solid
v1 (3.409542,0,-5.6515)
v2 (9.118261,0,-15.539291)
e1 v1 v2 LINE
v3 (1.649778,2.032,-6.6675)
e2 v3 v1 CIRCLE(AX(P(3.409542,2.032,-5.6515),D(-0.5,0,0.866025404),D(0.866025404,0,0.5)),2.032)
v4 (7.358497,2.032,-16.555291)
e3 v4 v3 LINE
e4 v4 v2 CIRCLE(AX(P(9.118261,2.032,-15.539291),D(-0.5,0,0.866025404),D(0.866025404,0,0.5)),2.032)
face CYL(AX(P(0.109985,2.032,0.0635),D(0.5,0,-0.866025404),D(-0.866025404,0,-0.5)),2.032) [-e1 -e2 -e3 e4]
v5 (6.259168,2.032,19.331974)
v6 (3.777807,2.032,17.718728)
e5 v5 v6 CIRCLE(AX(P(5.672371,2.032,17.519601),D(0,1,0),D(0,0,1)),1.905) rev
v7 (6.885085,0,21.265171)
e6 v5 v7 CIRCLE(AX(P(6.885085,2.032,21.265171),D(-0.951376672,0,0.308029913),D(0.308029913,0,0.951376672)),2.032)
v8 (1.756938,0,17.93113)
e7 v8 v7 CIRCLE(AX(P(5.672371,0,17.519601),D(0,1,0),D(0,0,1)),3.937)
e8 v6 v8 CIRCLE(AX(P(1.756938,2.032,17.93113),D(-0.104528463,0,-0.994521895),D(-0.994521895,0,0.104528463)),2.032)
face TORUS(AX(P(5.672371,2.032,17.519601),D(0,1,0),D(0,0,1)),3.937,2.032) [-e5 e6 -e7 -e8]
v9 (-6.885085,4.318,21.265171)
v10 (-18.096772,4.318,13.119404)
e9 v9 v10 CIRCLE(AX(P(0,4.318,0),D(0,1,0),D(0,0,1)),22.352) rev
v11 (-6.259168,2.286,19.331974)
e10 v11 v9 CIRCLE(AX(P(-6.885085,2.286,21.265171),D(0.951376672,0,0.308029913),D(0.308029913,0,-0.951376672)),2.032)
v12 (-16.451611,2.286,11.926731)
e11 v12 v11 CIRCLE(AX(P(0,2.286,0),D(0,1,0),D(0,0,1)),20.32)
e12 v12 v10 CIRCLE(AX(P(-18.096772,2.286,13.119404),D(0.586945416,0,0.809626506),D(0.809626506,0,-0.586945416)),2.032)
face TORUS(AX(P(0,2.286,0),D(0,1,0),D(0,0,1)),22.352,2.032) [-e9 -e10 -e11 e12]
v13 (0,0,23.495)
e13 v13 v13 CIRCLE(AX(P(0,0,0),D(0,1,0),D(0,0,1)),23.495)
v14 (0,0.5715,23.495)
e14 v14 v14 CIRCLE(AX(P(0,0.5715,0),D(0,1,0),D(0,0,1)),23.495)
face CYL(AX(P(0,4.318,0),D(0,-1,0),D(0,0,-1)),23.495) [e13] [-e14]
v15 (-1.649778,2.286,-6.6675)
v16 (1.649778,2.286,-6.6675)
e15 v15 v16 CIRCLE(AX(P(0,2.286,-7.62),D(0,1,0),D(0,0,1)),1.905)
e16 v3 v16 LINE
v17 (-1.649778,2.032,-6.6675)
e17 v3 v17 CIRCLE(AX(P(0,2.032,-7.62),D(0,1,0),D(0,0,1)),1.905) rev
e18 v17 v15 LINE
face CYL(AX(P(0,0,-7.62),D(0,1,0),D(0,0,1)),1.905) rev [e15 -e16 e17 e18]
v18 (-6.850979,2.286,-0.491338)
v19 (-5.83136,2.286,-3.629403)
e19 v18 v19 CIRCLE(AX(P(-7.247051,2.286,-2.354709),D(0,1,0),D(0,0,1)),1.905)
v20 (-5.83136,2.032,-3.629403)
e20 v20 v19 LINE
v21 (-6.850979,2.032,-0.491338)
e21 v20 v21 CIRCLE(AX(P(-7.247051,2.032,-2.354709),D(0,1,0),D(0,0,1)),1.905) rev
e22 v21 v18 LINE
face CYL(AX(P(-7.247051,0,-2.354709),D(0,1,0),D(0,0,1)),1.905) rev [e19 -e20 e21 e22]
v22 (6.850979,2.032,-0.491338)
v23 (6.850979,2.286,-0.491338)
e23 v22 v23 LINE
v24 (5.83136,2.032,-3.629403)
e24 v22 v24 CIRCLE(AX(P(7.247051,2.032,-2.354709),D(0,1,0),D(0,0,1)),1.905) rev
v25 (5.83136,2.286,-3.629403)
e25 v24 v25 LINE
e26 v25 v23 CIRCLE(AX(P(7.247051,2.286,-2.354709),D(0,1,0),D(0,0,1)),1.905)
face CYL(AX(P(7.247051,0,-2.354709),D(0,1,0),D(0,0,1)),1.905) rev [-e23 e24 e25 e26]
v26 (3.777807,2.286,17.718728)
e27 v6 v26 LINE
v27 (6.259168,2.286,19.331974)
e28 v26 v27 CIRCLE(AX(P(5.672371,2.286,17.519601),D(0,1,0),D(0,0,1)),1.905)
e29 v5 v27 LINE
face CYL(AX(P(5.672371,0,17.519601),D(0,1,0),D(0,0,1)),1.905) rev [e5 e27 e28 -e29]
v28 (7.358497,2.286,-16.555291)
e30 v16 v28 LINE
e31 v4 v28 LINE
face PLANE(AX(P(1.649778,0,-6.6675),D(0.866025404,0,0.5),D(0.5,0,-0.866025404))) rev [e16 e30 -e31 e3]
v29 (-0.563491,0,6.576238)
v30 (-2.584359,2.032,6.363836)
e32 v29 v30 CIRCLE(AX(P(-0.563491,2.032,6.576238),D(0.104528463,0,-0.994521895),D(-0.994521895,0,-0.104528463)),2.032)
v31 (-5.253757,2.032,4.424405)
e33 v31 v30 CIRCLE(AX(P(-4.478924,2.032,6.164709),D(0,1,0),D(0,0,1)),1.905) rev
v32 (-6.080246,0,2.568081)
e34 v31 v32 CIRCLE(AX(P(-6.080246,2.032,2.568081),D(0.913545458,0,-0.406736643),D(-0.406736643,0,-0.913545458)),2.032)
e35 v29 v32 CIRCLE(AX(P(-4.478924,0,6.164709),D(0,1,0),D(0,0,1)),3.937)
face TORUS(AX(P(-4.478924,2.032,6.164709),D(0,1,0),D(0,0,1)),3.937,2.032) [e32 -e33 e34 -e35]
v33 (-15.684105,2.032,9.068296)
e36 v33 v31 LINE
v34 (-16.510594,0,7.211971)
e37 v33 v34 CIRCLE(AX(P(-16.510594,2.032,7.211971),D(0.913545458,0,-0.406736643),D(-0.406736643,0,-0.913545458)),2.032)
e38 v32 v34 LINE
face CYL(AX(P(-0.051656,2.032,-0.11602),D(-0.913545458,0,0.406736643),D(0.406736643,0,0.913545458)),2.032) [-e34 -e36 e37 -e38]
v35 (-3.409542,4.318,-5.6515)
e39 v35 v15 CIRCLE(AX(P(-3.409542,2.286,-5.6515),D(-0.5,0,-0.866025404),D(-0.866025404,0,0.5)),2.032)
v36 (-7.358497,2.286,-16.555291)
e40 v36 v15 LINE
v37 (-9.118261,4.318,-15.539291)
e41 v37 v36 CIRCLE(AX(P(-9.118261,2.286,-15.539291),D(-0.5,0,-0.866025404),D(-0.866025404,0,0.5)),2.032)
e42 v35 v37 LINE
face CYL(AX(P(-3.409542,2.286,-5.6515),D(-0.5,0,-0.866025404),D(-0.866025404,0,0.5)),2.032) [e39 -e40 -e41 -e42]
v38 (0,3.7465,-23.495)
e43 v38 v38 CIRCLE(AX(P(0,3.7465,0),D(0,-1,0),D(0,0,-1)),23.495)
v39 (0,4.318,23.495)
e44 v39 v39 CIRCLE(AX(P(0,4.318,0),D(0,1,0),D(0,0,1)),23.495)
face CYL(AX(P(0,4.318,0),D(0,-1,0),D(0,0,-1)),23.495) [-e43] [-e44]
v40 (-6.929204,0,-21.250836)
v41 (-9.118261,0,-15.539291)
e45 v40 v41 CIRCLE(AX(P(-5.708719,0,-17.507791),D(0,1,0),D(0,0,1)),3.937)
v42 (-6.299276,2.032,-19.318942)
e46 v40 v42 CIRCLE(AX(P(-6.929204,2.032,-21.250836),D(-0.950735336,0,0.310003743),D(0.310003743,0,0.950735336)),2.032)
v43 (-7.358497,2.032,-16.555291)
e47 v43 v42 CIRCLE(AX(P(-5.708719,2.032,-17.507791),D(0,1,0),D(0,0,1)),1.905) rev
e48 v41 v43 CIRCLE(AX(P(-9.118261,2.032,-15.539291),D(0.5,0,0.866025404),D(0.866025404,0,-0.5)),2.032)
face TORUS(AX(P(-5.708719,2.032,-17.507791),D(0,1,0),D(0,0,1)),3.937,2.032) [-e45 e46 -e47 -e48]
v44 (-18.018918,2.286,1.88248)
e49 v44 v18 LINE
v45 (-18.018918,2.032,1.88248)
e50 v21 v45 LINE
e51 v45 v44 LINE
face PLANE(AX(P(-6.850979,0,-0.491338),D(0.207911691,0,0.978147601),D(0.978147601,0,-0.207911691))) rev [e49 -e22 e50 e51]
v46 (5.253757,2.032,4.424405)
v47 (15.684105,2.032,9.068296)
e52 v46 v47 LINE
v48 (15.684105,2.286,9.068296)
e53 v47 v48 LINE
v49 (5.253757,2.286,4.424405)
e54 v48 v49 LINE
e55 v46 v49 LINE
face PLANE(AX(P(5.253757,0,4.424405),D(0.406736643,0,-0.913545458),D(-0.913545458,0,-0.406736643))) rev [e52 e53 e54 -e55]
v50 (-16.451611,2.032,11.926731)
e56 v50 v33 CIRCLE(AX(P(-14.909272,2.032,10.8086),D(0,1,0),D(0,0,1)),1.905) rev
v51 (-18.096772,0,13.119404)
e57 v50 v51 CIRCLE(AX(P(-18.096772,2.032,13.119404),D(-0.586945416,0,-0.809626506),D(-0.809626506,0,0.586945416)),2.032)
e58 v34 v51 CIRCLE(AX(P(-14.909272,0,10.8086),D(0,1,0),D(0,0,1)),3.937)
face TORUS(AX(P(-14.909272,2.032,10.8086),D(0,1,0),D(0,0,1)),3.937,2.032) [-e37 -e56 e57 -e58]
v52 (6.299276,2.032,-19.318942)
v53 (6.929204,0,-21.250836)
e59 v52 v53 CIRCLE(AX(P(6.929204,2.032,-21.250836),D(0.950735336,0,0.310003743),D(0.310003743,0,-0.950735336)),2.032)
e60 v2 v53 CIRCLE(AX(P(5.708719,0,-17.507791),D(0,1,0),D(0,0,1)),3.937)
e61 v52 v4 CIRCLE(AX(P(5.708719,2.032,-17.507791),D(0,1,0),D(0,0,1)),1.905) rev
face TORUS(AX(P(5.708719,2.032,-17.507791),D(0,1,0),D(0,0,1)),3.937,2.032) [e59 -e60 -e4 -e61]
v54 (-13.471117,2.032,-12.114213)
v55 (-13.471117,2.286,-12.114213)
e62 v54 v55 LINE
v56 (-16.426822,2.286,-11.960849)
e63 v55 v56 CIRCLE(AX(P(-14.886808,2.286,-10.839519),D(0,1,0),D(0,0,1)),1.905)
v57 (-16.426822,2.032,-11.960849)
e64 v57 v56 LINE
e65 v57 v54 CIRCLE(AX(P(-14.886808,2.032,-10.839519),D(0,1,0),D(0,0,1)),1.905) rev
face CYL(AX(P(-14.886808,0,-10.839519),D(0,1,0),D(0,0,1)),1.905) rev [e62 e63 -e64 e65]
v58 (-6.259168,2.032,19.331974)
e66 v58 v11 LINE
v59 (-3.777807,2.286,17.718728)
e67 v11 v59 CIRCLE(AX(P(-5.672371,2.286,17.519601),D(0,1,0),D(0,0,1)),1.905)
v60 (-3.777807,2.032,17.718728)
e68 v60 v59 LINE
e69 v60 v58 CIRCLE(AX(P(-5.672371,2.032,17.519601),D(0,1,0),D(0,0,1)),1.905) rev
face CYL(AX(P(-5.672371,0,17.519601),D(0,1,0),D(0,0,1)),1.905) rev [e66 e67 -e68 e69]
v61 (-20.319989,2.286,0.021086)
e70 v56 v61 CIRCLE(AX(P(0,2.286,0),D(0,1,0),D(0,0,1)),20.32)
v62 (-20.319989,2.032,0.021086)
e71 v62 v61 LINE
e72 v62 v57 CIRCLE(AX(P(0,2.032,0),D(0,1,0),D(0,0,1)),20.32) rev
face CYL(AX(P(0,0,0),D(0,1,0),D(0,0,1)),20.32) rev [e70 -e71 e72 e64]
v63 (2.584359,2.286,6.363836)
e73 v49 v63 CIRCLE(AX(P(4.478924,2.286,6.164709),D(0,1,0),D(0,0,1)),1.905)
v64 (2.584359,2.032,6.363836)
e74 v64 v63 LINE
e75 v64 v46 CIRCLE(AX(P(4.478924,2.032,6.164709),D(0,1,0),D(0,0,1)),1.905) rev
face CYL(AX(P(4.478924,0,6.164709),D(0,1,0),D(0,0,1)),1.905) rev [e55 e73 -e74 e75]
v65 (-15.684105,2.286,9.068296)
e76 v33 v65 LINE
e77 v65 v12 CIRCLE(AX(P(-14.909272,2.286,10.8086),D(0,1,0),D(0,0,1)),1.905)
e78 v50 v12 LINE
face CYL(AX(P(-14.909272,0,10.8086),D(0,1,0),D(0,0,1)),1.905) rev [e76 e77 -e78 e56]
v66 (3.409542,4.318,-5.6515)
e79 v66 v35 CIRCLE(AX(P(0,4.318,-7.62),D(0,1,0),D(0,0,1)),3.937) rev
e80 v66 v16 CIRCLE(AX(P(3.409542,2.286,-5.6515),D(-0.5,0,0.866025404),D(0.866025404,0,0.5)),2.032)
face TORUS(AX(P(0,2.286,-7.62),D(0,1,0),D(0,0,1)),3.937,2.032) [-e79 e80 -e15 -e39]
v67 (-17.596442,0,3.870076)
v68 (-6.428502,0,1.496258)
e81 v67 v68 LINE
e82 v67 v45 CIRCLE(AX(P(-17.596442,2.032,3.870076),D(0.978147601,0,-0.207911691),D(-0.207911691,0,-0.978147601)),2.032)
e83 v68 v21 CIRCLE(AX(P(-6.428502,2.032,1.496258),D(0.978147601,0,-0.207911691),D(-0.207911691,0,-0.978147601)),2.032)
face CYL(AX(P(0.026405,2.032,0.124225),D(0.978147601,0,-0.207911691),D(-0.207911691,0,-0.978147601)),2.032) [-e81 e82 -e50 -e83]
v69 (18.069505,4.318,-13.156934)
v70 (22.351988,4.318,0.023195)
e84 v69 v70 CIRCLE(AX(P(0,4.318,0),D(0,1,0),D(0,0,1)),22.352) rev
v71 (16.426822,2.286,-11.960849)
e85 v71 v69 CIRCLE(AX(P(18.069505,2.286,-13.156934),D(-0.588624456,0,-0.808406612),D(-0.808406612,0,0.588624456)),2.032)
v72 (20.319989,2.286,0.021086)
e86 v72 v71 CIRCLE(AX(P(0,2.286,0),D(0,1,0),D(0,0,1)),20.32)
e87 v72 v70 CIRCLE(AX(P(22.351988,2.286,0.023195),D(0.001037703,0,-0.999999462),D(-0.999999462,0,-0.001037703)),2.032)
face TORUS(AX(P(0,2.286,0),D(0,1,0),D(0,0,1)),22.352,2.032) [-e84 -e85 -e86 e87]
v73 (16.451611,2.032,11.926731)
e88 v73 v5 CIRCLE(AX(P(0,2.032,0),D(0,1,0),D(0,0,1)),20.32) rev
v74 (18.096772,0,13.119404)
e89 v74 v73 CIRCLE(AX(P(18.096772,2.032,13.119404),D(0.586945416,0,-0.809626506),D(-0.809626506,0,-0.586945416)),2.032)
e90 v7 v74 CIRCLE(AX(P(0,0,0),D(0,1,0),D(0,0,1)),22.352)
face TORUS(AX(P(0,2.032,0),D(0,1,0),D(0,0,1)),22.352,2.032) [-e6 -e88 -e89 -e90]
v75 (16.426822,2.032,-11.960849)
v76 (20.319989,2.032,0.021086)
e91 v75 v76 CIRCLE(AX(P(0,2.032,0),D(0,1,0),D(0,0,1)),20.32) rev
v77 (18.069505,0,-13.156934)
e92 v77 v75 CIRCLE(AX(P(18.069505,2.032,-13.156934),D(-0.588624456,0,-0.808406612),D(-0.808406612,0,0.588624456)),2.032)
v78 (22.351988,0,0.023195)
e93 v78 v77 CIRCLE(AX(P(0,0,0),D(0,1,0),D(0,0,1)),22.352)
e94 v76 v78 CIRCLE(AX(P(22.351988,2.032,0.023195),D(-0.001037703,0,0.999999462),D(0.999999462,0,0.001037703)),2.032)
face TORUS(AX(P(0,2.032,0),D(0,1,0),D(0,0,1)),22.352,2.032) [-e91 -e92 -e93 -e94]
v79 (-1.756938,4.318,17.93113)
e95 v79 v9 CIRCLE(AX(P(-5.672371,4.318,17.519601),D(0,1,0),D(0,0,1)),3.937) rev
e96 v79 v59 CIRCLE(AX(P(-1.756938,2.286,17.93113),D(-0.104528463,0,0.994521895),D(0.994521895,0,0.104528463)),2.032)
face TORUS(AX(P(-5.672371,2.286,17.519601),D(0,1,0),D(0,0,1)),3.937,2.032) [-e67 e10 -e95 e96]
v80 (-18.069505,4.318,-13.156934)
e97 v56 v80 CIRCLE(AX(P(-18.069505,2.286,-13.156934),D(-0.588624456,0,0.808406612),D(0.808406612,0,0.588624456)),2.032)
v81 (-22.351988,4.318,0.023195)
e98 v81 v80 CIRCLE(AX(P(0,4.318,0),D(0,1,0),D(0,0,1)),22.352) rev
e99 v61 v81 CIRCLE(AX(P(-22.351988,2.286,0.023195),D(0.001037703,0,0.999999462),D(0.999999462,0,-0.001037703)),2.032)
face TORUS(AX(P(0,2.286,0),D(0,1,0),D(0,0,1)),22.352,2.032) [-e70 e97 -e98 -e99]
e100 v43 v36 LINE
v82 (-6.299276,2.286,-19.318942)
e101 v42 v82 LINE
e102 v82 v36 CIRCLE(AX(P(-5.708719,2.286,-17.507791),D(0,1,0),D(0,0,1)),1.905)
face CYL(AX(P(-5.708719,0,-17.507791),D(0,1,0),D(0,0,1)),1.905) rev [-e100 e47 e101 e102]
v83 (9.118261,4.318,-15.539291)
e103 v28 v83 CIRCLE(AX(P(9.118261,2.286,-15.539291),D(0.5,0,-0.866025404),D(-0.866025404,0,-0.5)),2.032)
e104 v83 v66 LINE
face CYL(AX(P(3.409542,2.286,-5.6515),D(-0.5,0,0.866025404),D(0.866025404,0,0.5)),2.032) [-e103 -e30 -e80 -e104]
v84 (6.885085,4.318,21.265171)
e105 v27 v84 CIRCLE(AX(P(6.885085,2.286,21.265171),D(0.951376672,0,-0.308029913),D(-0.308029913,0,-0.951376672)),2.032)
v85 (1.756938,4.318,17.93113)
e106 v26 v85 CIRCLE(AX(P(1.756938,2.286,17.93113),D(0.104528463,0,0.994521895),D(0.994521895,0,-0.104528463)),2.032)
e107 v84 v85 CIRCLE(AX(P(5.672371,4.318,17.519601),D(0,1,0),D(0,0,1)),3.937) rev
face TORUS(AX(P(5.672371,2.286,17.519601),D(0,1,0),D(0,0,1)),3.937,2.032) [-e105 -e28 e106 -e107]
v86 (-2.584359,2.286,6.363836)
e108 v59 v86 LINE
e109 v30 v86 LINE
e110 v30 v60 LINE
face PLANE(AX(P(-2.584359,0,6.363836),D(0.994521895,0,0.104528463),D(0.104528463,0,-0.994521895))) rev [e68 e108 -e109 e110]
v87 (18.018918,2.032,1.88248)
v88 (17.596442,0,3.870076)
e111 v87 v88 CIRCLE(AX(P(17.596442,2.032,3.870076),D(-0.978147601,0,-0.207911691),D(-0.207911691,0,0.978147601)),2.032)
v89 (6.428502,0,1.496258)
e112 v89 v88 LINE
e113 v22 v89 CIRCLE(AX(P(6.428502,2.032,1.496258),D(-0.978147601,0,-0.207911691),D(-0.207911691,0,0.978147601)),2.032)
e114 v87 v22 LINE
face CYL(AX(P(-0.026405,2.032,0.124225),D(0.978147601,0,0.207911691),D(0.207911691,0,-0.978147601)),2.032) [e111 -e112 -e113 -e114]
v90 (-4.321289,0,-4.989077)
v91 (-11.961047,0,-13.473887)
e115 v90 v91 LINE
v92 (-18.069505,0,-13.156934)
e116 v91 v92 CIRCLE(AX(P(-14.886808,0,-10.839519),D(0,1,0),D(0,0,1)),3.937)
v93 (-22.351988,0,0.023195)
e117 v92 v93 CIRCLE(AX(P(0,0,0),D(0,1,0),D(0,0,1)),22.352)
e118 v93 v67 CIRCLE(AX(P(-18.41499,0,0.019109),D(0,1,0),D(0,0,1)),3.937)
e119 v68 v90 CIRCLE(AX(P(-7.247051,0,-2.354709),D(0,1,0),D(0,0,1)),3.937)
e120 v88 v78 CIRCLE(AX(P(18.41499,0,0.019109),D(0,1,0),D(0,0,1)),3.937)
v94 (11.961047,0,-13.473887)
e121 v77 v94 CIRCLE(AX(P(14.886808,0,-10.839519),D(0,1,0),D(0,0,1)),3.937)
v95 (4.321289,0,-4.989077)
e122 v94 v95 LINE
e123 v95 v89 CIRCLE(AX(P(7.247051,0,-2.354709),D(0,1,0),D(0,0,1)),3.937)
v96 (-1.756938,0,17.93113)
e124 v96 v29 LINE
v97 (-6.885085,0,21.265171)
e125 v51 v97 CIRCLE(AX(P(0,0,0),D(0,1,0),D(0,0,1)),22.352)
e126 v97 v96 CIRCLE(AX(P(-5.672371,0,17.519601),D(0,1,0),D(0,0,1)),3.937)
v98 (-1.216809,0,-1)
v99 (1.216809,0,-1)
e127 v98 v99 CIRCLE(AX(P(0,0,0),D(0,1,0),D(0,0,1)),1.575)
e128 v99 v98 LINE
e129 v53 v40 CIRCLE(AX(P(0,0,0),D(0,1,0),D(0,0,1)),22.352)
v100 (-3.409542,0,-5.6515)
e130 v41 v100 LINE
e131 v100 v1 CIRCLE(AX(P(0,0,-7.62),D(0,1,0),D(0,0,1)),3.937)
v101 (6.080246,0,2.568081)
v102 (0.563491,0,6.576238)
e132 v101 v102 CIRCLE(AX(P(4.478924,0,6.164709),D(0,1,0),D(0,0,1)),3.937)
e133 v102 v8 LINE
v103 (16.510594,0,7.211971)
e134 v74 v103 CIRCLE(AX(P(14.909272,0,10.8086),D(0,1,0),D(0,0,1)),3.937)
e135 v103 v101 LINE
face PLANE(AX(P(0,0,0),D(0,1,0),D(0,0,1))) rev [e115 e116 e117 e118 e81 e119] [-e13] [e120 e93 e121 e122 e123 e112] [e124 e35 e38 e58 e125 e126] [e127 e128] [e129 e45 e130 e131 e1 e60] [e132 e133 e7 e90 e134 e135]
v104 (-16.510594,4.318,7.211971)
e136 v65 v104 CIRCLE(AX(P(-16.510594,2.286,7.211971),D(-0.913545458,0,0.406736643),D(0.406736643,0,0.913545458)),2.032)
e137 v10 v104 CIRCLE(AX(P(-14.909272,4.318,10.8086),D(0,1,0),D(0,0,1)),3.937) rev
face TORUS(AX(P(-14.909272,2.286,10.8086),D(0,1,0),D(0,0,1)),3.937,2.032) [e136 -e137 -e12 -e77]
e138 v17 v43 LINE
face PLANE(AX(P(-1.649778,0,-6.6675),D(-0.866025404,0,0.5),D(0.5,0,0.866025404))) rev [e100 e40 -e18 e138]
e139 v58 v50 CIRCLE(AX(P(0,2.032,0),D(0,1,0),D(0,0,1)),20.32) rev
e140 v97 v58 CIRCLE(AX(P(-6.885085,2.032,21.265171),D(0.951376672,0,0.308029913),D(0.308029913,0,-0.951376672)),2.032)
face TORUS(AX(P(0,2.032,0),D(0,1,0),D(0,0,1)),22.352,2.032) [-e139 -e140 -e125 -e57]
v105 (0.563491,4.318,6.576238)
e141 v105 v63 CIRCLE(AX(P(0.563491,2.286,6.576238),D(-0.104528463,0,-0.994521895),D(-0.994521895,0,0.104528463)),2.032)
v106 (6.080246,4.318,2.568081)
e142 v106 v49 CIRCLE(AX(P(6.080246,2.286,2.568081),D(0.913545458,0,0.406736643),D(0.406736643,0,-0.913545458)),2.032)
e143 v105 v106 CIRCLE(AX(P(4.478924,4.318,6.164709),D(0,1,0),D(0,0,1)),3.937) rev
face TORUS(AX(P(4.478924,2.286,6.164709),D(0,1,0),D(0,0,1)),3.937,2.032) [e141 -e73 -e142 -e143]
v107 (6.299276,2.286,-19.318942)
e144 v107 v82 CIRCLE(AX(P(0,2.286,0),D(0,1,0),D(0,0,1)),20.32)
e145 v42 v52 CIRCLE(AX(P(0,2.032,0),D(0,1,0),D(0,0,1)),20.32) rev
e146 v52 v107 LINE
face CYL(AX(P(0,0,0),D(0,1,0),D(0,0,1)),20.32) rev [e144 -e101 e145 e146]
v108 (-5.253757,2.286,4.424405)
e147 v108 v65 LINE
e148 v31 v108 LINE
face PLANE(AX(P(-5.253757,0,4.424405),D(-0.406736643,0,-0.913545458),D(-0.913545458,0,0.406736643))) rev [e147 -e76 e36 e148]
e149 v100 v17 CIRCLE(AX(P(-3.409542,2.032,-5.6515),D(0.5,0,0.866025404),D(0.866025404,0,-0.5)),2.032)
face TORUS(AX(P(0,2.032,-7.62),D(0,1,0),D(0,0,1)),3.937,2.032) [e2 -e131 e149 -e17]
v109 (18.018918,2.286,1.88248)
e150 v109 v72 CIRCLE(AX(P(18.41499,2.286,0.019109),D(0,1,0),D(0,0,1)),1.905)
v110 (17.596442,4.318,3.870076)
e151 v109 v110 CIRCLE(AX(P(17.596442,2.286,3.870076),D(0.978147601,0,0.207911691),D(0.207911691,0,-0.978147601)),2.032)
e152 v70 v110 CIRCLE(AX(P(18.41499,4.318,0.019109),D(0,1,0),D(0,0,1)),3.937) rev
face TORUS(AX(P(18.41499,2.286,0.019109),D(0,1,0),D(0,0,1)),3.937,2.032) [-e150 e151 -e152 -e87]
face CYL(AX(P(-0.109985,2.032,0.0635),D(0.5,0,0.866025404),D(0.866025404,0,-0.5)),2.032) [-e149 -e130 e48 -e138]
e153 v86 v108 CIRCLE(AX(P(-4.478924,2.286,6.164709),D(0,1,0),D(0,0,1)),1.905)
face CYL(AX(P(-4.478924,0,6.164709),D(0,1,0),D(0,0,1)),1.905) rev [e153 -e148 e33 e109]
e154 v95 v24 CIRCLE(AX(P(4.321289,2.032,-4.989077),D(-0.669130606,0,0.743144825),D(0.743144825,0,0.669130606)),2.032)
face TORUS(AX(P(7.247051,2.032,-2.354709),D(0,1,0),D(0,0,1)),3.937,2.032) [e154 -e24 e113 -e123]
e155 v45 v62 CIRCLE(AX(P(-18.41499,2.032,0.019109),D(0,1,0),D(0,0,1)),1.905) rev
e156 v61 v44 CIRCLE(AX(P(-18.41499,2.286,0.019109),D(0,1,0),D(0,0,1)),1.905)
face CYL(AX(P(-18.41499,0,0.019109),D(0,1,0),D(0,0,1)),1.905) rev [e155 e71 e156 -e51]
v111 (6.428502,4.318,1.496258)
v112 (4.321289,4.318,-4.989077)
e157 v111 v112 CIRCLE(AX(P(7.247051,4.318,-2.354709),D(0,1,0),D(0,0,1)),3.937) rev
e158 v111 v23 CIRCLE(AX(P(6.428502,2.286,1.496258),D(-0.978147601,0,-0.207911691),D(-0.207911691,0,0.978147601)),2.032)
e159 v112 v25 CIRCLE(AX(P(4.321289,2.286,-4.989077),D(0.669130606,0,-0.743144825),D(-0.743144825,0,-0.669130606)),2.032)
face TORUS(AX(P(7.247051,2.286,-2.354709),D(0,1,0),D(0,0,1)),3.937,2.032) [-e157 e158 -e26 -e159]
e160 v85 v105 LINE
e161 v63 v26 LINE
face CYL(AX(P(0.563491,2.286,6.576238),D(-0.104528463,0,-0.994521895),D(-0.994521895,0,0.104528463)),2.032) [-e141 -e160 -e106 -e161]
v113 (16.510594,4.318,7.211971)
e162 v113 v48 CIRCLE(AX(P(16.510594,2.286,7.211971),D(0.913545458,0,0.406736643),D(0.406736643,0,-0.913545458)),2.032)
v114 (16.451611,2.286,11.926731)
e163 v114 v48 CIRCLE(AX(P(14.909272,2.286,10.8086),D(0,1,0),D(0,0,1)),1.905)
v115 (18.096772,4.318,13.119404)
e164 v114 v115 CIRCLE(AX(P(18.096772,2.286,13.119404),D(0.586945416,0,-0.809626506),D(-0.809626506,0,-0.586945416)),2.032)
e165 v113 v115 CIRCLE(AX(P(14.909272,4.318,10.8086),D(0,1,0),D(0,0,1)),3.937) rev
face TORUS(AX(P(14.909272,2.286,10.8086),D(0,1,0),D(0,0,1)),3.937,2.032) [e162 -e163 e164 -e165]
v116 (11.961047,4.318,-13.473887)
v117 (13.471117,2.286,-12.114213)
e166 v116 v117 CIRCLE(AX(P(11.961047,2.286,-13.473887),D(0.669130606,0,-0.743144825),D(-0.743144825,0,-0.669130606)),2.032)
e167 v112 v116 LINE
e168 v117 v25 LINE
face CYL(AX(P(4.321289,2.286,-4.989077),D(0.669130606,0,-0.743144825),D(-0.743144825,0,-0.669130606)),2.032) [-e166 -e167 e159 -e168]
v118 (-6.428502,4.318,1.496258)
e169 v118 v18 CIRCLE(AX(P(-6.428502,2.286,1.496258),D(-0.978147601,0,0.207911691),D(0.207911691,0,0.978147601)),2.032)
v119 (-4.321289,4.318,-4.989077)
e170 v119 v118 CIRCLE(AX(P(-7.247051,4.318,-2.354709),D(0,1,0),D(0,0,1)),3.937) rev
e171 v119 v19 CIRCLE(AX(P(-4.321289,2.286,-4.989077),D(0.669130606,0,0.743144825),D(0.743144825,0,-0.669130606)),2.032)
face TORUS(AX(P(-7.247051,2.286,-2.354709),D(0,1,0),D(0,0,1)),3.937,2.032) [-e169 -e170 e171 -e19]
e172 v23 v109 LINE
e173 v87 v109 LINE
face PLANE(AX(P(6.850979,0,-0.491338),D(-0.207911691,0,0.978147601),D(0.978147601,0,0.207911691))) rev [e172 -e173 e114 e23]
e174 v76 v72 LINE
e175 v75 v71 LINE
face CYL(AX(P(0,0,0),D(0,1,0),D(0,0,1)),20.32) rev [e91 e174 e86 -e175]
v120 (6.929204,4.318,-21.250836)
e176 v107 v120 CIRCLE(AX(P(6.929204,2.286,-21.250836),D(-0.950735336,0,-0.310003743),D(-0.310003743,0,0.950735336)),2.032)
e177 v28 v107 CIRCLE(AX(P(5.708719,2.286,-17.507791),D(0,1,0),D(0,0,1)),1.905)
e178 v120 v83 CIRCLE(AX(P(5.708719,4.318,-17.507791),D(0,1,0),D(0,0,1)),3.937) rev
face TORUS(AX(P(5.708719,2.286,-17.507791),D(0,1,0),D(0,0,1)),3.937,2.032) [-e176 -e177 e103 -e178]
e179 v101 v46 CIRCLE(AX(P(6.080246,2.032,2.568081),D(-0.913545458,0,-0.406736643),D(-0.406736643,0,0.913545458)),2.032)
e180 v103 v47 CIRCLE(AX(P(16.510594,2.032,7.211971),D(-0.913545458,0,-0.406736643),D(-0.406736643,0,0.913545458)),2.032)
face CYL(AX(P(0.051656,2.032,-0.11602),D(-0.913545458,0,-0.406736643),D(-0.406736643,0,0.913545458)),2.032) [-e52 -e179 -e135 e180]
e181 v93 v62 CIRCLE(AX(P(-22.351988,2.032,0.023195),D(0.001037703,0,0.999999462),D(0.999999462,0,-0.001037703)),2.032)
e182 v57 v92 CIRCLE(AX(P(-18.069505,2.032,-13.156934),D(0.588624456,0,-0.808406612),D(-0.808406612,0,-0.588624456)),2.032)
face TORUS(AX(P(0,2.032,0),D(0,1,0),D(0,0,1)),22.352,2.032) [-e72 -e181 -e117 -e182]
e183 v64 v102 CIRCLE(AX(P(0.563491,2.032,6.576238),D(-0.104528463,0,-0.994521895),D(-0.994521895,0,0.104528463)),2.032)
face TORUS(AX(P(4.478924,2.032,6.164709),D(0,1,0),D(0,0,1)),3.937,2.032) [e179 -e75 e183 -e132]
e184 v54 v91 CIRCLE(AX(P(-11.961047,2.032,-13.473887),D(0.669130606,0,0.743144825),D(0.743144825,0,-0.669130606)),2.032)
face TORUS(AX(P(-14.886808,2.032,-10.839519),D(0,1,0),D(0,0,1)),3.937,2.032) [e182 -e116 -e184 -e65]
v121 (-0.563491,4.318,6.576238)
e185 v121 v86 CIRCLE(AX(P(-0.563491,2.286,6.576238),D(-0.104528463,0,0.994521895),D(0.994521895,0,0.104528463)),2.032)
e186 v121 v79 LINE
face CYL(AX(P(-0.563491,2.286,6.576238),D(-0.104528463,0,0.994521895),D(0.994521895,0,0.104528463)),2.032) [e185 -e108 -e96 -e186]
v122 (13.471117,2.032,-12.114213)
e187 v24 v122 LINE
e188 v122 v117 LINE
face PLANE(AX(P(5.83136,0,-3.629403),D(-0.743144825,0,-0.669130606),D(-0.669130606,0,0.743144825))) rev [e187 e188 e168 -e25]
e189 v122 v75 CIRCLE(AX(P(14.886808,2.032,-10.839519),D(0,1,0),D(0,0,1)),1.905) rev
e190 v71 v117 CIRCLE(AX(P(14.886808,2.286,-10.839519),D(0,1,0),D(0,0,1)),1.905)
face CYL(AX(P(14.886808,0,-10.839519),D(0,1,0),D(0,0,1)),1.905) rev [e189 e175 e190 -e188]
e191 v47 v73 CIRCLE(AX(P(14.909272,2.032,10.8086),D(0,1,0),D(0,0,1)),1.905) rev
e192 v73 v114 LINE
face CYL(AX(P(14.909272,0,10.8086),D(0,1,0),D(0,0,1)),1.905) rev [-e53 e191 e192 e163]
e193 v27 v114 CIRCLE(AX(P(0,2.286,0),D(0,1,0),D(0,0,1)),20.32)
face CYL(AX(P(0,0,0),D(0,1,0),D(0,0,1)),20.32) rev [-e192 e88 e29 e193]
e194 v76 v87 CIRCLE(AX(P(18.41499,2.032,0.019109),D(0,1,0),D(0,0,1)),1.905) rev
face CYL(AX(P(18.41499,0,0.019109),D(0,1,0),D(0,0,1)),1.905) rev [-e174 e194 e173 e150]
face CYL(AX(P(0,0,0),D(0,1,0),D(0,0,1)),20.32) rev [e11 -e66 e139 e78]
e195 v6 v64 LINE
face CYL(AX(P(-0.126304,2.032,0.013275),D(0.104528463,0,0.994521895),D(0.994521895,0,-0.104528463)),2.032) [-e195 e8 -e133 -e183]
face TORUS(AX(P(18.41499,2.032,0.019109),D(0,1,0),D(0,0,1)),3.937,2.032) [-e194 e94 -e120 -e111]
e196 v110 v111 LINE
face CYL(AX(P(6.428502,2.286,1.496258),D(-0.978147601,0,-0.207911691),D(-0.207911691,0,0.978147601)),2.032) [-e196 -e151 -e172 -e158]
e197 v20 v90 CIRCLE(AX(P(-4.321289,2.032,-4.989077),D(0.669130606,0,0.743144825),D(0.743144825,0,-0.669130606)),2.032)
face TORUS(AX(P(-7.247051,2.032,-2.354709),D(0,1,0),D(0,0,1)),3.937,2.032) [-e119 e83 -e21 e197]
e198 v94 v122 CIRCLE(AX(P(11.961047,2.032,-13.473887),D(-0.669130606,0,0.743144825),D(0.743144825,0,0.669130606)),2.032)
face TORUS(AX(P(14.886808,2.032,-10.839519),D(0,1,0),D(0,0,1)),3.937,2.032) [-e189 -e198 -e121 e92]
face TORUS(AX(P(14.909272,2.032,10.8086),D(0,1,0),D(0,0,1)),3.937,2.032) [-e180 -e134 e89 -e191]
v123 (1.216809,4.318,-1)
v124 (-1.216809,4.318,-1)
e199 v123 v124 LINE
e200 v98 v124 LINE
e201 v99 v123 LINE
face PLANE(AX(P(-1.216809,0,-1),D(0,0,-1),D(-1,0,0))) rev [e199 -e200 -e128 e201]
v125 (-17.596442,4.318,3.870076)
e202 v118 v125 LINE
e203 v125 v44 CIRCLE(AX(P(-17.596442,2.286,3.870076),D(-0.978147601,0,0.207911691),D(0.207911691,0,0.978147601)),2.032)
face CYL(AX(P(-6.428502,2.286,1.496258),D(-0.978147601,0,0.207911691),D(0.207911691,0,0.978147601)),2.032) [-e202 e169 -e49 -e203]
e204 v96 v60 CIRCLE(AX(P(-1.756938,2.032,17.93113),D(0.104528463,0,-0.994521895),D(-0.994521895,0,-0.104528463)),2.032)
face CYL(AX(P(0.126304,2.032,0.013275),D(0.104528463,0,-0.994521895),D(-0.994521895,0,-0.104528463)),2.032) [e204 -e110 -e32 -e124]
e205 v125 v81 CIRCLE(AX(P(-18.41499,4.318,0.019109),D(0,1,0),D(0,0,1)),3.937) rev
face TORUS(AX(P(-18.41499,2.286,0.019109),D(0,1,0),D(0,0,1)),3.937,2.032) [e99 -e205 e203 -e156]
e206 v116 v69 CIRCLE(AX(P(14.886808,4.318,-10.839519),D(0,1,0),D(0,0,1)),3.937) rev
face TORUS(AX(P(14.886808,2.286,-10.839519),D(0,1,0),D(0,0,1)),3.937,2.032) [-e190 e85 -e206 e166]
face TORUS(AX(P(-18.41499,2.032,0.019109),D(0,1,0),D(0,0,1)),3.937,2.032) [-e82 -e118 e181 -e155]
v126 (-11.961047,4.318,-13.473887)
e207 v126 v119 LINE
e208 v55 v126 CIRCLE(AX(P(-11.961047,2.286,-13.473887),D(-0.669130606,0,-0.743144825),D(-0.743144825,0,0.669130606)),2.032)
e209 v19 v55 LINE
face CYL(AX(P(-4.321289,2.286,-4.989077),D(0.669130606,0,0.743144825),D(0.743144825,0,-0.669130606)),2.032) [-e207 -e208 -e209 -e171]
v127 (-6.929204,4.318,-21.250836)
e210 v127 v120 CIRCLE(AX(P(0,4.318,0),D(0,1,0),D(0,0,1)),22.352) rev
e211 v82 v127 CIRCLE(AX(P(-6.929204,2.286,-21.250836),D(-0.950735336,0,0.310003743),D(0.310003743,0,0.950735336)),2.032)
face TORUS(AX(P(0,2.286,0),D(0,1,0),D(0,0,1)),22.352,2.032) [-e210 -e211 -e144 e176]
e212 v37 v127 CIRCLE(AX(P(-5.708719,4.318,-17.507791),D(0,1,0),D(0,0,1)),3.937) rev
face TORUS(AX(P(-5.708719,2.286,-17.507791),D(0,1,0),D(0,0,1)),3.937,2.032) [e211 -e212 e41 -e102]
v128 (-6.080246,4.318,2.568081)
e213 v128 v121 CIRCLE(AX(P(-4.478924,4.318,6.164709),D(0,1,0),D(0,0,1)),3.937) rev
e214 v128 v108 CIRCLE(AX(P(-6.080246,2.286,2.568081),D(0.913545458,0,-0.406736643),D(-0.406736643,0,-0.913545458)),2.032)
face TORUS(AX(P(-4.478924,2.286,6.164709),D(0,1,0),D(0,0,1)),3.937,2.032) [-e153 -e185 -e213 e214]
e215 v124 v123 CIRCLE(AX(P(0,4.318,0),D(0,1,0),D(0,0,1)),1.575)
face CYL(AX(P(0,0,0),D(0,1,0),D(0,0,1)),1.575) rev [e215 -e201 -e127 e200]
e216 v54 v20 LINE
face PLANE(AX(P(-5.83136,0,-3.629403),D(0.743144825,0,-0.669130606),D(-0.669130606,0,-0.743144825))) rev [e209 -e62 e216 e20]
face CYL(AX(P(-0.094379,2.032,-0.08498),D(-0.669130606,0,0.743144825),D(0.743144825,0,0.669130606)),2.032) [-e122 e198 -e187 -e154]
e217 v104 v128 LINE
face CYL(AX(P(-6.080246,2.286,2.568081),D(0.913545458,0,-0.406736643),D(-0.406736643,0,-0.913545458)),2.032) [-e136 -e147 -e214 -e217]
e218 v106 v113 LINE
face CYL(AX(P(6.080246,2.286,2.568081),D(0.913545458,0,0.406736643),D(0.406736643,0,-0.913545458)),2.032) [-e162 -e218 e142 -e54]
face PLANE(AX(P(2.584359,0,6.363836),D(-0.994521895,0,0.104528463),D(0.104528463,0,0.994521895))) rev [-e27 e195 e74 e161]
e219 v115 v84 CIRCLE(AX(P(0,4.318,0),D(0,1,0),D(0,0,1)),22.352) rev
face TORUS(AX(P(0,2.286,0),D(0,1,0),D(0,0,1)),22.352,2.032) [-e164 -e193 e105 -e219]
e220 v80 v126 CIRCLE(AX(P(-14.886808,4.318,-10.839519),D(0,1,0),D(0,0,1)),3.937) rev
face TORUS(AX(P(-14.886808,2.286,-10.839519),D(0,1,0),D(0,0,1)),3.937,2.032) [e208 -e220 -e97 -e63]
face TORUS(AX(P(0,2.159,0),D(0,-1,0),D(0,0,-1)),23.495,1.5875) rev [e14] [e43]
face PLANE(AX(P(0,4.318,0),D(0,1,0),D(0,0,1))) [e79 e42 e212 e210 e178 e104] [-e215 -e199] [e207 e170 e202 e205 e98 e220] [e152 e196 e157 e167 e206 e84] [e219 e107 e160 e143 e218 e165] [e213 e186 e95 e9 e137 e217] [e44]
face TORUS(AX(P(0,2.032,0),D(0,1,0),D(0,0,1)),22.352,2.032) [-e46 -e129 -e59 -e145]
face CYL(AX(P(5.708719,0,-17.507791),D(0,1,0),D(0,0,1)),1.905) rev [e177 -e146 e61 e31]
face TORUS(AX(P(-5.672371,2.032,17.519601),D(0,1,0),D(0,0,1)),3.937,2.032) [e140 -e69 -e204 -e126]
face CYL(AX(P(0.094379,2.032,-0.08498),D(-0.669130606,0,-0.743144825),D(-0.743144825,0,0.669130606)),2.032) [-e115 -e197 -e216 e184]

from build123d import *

# Parameters (mm, degrees)
SKETCH1_R                = 23.495
BOSS_EXTRUDE1_DEPTH      = 4.318
CUT_EXTRUDE1_DEPTH       = 34.50634528
CUT_EXTRUDE2_DEPTH       = 34.50634528
FILLET1_R                = 2.032
CIRPATTERN1_COUNT        = 5
FILLET1_OF_CIRPATTERN1_R = 2.032


# Read off the part's stored shape, not the designer's step: Cut-Revolve1
with BuildPart() as part:
    # Sketch1 → Boss-Extrude1 (new body)
    with BuildSketch(Plane(origin=(0, 0, 0), x_dir=(1, 0, 0), z_dir=(0, 1, 0))):
        with Locations(Location((0, 0, 0), (0, 0, 270))):
            Circle(SKETCH1_R)
    extrude(amount=BOSS_EXTRUDE1_DEPTH)

    # Sketch2 → Cut-Extrude1 (cut, through all)
    with BuildSketch(Plane(origin=(0, 4.318, 0), x_dir=(1, 0, 0), z_dir=(0, 1, 0))):
        with BuildLine():
            Line((-1.216809358, 1.000000032), (1.216809358, 1.000000032))
            ThreePointArc((1.216809358, 1.000000032), (0, -1.575000025), (-1.216809358, 1.000000032))
        make_face()
    extrude(amount=-CUT_EXTRUDE1_DEPTH, mode=Mode.SUBTRACT)

    # Sketch3 → Cut-Extrude2 (cut, through all)
    with BuildSketch(Plane(origin=(0, 4.318, 0), x_dir=(1, 0, 0), z_dir=(0, 1, 0))):
        with BuildLine():
            Line((-1.649778394, 6.6675), (-7.358497315, 16.555291217))
            ThreePointArc((-7.358497315, 16.555291217), (-7.487543609, 18.189559306), (-6.29927605, 19.318942032))
            ThreePointArc((-6.29927605, 19.318942032), (0, 20.32), (6.29927605, 19.318942032))
            ThreePointArc((6.29927605, 19.318942032), (7.487543609, 18.189559306), (7.358497315, 16.555291217))
            Line((7.358497315, 16.555291217), (1.649778394, 6.6675))
            ThreePointArc((1.649778394, 6.6675), (0, 5.715), (-1.649778394, 6.6675))
        make_face()
    cut_extrude2 = extrude(amount=-CUT_EXTRUDE2_DEPTH, mode=Mode.SUBTRACT)

    # Fillet1
    fillet1_edges = [part.edges().sort_by_distance(p)[0] for p in [
        (0, 0, -5.715),
        (-4.504137855, 0, -11.611395608),
        (-7.487543609, 0, -18.189559306),
        (0, 0, -20.32),
        (7.487543609, 0, -18.189559306),
        (4.504137855, 0, -11.611395608),
        (0, 4.318, -5.715),
        (4.504137855, 4.318, -11.611395608),
        (7.487543609, 4.318, -18.189559306),
        (0, 4.318, -20.32),
        (-7.487543609, 4.318, -18.189559306),
        (-4.504137855, 4.318, -11.611395608),
    ]]
    fillet(fillet1_edges, radius=FILLET1_R)

    # CirPattern1: Cut-Extrude2 ×5 about axis
    cirpattern1_axis = Axis((0, 0, 0), (0, 1, 0))
    for i in range(1, CIRPATTERN1_COUNT):
        add(cut_extrude2.rotate(cirpattern1_axis, i * 360 / CIRPATTERN1_COUNT), mode=Mode.SUBTRACT)

    # Fillet1 of CirPattern1
    fillet1_of_cirpattern1_edges = [part.edges().sort_by_distance(p)[0] for p in [
        (-5.435287991, 0, -1.766032123),
        (-12.434948599, 0, 0.695571085),
        (-19.613077128, 0, 1.500194195),
        (-19.325468411, 0, -6.279225326),
        (-14.985520685, 0, -12.741960086),
        (-9.651238315, 0, -7.871808228),
        (-5.435287991, 4.318, -1.766032123),
        (-9.651238315, 4.318, -7.871808228),
        (-14.985520685, 4.318, -12.741960086),
        (-19.325468411, 4.318, -6.279225326),
        (-19.613077128, 4.318, 1.500194195),
        (-12.434948599, 4.318, 0.695571085),
        (-3.359192717, 0, 4.623532123),
        (-3.181083028, 0, 12.041282181),
        (-4.63400468, 0, 19.116730308),
        (-11.943796327, 0, 16.439225326),
        (-16.749104732, 0, 10.314594889),
        (-10.468931166, 0, 6.74635057),
        (-3.359192717, 4.318, 4.623532123),
        (-10.468931166, 4.318, 6.74635057),
        (-16.749104732, 4.318, 10.314594889),
        (-11.943796327, 4.318, 16.439225326),
        (-4.63400468, 4.318, 19.116730308),
        (-3.181083028, 4.318, 12.041282181),
        (3.359192717, 0, 4.623532123),
        (10.468931166, 0, 6.74635057),
        (16.749104732, 0, 10.314594889),
        (11.943796327, 0, 16.439225326),
        (4.63400468, 0, 19.116730308),
        (3.181083028, 0, 12.041282181),
        (3.359192717, 4.318, 4.623532123),
        (3.181083028, 4.318, 12.041282181),
        (4.63400468, 4.318, 19.116730308),
        (11.943796327, 4.318, 16.439225326),
        (16.749104732, 4.318, 10.314594889),
        (10.468931166, 4.318, 6.74635057),
        (5.435287991, 0, -1.766032123),
        (9.651238315, 0, -7.871808228),
        (14.985520685, 0, -12.741960086),
        (19.325468411, 0, -6.279225326),
        (19.613077128, 0, 1.500194195),
        (12.434948599, 0, 0.695571085),
        (5.435287991, 4.318, -1.766032123),
        (12.434948599, 4.318, 0.695571085),
        (19.613077128, 4.318, 1.500194195),
        (19.325468411, 4.318, -6.279225326),
        (14.985520685, 4.318, -12.741960086),
        (9.651238315, 4.318, -7.871808228),
    ]]
    fillet(fillet1_of_cirpattern1_edges, radius=FILLET1_OF_CIRPATTERN1_R)

    # Cut-Revolve1 outline → Cut-Revolve1 (revolve, cut)
    with BuildSketch(Plane.XY):
        with BuildLine():
            ThreePointArc((23.495, 3.7465), (21.9075, 2.159), (23.495, 0.5715))
            Line((23.495, 0.5715), (23.495, 3.7465))
        make_face()
    revolve(axis=Axis((0, 0, 0), (0, 1, 0)), mode=Mode.SUBTRACT)


solid = part.part
